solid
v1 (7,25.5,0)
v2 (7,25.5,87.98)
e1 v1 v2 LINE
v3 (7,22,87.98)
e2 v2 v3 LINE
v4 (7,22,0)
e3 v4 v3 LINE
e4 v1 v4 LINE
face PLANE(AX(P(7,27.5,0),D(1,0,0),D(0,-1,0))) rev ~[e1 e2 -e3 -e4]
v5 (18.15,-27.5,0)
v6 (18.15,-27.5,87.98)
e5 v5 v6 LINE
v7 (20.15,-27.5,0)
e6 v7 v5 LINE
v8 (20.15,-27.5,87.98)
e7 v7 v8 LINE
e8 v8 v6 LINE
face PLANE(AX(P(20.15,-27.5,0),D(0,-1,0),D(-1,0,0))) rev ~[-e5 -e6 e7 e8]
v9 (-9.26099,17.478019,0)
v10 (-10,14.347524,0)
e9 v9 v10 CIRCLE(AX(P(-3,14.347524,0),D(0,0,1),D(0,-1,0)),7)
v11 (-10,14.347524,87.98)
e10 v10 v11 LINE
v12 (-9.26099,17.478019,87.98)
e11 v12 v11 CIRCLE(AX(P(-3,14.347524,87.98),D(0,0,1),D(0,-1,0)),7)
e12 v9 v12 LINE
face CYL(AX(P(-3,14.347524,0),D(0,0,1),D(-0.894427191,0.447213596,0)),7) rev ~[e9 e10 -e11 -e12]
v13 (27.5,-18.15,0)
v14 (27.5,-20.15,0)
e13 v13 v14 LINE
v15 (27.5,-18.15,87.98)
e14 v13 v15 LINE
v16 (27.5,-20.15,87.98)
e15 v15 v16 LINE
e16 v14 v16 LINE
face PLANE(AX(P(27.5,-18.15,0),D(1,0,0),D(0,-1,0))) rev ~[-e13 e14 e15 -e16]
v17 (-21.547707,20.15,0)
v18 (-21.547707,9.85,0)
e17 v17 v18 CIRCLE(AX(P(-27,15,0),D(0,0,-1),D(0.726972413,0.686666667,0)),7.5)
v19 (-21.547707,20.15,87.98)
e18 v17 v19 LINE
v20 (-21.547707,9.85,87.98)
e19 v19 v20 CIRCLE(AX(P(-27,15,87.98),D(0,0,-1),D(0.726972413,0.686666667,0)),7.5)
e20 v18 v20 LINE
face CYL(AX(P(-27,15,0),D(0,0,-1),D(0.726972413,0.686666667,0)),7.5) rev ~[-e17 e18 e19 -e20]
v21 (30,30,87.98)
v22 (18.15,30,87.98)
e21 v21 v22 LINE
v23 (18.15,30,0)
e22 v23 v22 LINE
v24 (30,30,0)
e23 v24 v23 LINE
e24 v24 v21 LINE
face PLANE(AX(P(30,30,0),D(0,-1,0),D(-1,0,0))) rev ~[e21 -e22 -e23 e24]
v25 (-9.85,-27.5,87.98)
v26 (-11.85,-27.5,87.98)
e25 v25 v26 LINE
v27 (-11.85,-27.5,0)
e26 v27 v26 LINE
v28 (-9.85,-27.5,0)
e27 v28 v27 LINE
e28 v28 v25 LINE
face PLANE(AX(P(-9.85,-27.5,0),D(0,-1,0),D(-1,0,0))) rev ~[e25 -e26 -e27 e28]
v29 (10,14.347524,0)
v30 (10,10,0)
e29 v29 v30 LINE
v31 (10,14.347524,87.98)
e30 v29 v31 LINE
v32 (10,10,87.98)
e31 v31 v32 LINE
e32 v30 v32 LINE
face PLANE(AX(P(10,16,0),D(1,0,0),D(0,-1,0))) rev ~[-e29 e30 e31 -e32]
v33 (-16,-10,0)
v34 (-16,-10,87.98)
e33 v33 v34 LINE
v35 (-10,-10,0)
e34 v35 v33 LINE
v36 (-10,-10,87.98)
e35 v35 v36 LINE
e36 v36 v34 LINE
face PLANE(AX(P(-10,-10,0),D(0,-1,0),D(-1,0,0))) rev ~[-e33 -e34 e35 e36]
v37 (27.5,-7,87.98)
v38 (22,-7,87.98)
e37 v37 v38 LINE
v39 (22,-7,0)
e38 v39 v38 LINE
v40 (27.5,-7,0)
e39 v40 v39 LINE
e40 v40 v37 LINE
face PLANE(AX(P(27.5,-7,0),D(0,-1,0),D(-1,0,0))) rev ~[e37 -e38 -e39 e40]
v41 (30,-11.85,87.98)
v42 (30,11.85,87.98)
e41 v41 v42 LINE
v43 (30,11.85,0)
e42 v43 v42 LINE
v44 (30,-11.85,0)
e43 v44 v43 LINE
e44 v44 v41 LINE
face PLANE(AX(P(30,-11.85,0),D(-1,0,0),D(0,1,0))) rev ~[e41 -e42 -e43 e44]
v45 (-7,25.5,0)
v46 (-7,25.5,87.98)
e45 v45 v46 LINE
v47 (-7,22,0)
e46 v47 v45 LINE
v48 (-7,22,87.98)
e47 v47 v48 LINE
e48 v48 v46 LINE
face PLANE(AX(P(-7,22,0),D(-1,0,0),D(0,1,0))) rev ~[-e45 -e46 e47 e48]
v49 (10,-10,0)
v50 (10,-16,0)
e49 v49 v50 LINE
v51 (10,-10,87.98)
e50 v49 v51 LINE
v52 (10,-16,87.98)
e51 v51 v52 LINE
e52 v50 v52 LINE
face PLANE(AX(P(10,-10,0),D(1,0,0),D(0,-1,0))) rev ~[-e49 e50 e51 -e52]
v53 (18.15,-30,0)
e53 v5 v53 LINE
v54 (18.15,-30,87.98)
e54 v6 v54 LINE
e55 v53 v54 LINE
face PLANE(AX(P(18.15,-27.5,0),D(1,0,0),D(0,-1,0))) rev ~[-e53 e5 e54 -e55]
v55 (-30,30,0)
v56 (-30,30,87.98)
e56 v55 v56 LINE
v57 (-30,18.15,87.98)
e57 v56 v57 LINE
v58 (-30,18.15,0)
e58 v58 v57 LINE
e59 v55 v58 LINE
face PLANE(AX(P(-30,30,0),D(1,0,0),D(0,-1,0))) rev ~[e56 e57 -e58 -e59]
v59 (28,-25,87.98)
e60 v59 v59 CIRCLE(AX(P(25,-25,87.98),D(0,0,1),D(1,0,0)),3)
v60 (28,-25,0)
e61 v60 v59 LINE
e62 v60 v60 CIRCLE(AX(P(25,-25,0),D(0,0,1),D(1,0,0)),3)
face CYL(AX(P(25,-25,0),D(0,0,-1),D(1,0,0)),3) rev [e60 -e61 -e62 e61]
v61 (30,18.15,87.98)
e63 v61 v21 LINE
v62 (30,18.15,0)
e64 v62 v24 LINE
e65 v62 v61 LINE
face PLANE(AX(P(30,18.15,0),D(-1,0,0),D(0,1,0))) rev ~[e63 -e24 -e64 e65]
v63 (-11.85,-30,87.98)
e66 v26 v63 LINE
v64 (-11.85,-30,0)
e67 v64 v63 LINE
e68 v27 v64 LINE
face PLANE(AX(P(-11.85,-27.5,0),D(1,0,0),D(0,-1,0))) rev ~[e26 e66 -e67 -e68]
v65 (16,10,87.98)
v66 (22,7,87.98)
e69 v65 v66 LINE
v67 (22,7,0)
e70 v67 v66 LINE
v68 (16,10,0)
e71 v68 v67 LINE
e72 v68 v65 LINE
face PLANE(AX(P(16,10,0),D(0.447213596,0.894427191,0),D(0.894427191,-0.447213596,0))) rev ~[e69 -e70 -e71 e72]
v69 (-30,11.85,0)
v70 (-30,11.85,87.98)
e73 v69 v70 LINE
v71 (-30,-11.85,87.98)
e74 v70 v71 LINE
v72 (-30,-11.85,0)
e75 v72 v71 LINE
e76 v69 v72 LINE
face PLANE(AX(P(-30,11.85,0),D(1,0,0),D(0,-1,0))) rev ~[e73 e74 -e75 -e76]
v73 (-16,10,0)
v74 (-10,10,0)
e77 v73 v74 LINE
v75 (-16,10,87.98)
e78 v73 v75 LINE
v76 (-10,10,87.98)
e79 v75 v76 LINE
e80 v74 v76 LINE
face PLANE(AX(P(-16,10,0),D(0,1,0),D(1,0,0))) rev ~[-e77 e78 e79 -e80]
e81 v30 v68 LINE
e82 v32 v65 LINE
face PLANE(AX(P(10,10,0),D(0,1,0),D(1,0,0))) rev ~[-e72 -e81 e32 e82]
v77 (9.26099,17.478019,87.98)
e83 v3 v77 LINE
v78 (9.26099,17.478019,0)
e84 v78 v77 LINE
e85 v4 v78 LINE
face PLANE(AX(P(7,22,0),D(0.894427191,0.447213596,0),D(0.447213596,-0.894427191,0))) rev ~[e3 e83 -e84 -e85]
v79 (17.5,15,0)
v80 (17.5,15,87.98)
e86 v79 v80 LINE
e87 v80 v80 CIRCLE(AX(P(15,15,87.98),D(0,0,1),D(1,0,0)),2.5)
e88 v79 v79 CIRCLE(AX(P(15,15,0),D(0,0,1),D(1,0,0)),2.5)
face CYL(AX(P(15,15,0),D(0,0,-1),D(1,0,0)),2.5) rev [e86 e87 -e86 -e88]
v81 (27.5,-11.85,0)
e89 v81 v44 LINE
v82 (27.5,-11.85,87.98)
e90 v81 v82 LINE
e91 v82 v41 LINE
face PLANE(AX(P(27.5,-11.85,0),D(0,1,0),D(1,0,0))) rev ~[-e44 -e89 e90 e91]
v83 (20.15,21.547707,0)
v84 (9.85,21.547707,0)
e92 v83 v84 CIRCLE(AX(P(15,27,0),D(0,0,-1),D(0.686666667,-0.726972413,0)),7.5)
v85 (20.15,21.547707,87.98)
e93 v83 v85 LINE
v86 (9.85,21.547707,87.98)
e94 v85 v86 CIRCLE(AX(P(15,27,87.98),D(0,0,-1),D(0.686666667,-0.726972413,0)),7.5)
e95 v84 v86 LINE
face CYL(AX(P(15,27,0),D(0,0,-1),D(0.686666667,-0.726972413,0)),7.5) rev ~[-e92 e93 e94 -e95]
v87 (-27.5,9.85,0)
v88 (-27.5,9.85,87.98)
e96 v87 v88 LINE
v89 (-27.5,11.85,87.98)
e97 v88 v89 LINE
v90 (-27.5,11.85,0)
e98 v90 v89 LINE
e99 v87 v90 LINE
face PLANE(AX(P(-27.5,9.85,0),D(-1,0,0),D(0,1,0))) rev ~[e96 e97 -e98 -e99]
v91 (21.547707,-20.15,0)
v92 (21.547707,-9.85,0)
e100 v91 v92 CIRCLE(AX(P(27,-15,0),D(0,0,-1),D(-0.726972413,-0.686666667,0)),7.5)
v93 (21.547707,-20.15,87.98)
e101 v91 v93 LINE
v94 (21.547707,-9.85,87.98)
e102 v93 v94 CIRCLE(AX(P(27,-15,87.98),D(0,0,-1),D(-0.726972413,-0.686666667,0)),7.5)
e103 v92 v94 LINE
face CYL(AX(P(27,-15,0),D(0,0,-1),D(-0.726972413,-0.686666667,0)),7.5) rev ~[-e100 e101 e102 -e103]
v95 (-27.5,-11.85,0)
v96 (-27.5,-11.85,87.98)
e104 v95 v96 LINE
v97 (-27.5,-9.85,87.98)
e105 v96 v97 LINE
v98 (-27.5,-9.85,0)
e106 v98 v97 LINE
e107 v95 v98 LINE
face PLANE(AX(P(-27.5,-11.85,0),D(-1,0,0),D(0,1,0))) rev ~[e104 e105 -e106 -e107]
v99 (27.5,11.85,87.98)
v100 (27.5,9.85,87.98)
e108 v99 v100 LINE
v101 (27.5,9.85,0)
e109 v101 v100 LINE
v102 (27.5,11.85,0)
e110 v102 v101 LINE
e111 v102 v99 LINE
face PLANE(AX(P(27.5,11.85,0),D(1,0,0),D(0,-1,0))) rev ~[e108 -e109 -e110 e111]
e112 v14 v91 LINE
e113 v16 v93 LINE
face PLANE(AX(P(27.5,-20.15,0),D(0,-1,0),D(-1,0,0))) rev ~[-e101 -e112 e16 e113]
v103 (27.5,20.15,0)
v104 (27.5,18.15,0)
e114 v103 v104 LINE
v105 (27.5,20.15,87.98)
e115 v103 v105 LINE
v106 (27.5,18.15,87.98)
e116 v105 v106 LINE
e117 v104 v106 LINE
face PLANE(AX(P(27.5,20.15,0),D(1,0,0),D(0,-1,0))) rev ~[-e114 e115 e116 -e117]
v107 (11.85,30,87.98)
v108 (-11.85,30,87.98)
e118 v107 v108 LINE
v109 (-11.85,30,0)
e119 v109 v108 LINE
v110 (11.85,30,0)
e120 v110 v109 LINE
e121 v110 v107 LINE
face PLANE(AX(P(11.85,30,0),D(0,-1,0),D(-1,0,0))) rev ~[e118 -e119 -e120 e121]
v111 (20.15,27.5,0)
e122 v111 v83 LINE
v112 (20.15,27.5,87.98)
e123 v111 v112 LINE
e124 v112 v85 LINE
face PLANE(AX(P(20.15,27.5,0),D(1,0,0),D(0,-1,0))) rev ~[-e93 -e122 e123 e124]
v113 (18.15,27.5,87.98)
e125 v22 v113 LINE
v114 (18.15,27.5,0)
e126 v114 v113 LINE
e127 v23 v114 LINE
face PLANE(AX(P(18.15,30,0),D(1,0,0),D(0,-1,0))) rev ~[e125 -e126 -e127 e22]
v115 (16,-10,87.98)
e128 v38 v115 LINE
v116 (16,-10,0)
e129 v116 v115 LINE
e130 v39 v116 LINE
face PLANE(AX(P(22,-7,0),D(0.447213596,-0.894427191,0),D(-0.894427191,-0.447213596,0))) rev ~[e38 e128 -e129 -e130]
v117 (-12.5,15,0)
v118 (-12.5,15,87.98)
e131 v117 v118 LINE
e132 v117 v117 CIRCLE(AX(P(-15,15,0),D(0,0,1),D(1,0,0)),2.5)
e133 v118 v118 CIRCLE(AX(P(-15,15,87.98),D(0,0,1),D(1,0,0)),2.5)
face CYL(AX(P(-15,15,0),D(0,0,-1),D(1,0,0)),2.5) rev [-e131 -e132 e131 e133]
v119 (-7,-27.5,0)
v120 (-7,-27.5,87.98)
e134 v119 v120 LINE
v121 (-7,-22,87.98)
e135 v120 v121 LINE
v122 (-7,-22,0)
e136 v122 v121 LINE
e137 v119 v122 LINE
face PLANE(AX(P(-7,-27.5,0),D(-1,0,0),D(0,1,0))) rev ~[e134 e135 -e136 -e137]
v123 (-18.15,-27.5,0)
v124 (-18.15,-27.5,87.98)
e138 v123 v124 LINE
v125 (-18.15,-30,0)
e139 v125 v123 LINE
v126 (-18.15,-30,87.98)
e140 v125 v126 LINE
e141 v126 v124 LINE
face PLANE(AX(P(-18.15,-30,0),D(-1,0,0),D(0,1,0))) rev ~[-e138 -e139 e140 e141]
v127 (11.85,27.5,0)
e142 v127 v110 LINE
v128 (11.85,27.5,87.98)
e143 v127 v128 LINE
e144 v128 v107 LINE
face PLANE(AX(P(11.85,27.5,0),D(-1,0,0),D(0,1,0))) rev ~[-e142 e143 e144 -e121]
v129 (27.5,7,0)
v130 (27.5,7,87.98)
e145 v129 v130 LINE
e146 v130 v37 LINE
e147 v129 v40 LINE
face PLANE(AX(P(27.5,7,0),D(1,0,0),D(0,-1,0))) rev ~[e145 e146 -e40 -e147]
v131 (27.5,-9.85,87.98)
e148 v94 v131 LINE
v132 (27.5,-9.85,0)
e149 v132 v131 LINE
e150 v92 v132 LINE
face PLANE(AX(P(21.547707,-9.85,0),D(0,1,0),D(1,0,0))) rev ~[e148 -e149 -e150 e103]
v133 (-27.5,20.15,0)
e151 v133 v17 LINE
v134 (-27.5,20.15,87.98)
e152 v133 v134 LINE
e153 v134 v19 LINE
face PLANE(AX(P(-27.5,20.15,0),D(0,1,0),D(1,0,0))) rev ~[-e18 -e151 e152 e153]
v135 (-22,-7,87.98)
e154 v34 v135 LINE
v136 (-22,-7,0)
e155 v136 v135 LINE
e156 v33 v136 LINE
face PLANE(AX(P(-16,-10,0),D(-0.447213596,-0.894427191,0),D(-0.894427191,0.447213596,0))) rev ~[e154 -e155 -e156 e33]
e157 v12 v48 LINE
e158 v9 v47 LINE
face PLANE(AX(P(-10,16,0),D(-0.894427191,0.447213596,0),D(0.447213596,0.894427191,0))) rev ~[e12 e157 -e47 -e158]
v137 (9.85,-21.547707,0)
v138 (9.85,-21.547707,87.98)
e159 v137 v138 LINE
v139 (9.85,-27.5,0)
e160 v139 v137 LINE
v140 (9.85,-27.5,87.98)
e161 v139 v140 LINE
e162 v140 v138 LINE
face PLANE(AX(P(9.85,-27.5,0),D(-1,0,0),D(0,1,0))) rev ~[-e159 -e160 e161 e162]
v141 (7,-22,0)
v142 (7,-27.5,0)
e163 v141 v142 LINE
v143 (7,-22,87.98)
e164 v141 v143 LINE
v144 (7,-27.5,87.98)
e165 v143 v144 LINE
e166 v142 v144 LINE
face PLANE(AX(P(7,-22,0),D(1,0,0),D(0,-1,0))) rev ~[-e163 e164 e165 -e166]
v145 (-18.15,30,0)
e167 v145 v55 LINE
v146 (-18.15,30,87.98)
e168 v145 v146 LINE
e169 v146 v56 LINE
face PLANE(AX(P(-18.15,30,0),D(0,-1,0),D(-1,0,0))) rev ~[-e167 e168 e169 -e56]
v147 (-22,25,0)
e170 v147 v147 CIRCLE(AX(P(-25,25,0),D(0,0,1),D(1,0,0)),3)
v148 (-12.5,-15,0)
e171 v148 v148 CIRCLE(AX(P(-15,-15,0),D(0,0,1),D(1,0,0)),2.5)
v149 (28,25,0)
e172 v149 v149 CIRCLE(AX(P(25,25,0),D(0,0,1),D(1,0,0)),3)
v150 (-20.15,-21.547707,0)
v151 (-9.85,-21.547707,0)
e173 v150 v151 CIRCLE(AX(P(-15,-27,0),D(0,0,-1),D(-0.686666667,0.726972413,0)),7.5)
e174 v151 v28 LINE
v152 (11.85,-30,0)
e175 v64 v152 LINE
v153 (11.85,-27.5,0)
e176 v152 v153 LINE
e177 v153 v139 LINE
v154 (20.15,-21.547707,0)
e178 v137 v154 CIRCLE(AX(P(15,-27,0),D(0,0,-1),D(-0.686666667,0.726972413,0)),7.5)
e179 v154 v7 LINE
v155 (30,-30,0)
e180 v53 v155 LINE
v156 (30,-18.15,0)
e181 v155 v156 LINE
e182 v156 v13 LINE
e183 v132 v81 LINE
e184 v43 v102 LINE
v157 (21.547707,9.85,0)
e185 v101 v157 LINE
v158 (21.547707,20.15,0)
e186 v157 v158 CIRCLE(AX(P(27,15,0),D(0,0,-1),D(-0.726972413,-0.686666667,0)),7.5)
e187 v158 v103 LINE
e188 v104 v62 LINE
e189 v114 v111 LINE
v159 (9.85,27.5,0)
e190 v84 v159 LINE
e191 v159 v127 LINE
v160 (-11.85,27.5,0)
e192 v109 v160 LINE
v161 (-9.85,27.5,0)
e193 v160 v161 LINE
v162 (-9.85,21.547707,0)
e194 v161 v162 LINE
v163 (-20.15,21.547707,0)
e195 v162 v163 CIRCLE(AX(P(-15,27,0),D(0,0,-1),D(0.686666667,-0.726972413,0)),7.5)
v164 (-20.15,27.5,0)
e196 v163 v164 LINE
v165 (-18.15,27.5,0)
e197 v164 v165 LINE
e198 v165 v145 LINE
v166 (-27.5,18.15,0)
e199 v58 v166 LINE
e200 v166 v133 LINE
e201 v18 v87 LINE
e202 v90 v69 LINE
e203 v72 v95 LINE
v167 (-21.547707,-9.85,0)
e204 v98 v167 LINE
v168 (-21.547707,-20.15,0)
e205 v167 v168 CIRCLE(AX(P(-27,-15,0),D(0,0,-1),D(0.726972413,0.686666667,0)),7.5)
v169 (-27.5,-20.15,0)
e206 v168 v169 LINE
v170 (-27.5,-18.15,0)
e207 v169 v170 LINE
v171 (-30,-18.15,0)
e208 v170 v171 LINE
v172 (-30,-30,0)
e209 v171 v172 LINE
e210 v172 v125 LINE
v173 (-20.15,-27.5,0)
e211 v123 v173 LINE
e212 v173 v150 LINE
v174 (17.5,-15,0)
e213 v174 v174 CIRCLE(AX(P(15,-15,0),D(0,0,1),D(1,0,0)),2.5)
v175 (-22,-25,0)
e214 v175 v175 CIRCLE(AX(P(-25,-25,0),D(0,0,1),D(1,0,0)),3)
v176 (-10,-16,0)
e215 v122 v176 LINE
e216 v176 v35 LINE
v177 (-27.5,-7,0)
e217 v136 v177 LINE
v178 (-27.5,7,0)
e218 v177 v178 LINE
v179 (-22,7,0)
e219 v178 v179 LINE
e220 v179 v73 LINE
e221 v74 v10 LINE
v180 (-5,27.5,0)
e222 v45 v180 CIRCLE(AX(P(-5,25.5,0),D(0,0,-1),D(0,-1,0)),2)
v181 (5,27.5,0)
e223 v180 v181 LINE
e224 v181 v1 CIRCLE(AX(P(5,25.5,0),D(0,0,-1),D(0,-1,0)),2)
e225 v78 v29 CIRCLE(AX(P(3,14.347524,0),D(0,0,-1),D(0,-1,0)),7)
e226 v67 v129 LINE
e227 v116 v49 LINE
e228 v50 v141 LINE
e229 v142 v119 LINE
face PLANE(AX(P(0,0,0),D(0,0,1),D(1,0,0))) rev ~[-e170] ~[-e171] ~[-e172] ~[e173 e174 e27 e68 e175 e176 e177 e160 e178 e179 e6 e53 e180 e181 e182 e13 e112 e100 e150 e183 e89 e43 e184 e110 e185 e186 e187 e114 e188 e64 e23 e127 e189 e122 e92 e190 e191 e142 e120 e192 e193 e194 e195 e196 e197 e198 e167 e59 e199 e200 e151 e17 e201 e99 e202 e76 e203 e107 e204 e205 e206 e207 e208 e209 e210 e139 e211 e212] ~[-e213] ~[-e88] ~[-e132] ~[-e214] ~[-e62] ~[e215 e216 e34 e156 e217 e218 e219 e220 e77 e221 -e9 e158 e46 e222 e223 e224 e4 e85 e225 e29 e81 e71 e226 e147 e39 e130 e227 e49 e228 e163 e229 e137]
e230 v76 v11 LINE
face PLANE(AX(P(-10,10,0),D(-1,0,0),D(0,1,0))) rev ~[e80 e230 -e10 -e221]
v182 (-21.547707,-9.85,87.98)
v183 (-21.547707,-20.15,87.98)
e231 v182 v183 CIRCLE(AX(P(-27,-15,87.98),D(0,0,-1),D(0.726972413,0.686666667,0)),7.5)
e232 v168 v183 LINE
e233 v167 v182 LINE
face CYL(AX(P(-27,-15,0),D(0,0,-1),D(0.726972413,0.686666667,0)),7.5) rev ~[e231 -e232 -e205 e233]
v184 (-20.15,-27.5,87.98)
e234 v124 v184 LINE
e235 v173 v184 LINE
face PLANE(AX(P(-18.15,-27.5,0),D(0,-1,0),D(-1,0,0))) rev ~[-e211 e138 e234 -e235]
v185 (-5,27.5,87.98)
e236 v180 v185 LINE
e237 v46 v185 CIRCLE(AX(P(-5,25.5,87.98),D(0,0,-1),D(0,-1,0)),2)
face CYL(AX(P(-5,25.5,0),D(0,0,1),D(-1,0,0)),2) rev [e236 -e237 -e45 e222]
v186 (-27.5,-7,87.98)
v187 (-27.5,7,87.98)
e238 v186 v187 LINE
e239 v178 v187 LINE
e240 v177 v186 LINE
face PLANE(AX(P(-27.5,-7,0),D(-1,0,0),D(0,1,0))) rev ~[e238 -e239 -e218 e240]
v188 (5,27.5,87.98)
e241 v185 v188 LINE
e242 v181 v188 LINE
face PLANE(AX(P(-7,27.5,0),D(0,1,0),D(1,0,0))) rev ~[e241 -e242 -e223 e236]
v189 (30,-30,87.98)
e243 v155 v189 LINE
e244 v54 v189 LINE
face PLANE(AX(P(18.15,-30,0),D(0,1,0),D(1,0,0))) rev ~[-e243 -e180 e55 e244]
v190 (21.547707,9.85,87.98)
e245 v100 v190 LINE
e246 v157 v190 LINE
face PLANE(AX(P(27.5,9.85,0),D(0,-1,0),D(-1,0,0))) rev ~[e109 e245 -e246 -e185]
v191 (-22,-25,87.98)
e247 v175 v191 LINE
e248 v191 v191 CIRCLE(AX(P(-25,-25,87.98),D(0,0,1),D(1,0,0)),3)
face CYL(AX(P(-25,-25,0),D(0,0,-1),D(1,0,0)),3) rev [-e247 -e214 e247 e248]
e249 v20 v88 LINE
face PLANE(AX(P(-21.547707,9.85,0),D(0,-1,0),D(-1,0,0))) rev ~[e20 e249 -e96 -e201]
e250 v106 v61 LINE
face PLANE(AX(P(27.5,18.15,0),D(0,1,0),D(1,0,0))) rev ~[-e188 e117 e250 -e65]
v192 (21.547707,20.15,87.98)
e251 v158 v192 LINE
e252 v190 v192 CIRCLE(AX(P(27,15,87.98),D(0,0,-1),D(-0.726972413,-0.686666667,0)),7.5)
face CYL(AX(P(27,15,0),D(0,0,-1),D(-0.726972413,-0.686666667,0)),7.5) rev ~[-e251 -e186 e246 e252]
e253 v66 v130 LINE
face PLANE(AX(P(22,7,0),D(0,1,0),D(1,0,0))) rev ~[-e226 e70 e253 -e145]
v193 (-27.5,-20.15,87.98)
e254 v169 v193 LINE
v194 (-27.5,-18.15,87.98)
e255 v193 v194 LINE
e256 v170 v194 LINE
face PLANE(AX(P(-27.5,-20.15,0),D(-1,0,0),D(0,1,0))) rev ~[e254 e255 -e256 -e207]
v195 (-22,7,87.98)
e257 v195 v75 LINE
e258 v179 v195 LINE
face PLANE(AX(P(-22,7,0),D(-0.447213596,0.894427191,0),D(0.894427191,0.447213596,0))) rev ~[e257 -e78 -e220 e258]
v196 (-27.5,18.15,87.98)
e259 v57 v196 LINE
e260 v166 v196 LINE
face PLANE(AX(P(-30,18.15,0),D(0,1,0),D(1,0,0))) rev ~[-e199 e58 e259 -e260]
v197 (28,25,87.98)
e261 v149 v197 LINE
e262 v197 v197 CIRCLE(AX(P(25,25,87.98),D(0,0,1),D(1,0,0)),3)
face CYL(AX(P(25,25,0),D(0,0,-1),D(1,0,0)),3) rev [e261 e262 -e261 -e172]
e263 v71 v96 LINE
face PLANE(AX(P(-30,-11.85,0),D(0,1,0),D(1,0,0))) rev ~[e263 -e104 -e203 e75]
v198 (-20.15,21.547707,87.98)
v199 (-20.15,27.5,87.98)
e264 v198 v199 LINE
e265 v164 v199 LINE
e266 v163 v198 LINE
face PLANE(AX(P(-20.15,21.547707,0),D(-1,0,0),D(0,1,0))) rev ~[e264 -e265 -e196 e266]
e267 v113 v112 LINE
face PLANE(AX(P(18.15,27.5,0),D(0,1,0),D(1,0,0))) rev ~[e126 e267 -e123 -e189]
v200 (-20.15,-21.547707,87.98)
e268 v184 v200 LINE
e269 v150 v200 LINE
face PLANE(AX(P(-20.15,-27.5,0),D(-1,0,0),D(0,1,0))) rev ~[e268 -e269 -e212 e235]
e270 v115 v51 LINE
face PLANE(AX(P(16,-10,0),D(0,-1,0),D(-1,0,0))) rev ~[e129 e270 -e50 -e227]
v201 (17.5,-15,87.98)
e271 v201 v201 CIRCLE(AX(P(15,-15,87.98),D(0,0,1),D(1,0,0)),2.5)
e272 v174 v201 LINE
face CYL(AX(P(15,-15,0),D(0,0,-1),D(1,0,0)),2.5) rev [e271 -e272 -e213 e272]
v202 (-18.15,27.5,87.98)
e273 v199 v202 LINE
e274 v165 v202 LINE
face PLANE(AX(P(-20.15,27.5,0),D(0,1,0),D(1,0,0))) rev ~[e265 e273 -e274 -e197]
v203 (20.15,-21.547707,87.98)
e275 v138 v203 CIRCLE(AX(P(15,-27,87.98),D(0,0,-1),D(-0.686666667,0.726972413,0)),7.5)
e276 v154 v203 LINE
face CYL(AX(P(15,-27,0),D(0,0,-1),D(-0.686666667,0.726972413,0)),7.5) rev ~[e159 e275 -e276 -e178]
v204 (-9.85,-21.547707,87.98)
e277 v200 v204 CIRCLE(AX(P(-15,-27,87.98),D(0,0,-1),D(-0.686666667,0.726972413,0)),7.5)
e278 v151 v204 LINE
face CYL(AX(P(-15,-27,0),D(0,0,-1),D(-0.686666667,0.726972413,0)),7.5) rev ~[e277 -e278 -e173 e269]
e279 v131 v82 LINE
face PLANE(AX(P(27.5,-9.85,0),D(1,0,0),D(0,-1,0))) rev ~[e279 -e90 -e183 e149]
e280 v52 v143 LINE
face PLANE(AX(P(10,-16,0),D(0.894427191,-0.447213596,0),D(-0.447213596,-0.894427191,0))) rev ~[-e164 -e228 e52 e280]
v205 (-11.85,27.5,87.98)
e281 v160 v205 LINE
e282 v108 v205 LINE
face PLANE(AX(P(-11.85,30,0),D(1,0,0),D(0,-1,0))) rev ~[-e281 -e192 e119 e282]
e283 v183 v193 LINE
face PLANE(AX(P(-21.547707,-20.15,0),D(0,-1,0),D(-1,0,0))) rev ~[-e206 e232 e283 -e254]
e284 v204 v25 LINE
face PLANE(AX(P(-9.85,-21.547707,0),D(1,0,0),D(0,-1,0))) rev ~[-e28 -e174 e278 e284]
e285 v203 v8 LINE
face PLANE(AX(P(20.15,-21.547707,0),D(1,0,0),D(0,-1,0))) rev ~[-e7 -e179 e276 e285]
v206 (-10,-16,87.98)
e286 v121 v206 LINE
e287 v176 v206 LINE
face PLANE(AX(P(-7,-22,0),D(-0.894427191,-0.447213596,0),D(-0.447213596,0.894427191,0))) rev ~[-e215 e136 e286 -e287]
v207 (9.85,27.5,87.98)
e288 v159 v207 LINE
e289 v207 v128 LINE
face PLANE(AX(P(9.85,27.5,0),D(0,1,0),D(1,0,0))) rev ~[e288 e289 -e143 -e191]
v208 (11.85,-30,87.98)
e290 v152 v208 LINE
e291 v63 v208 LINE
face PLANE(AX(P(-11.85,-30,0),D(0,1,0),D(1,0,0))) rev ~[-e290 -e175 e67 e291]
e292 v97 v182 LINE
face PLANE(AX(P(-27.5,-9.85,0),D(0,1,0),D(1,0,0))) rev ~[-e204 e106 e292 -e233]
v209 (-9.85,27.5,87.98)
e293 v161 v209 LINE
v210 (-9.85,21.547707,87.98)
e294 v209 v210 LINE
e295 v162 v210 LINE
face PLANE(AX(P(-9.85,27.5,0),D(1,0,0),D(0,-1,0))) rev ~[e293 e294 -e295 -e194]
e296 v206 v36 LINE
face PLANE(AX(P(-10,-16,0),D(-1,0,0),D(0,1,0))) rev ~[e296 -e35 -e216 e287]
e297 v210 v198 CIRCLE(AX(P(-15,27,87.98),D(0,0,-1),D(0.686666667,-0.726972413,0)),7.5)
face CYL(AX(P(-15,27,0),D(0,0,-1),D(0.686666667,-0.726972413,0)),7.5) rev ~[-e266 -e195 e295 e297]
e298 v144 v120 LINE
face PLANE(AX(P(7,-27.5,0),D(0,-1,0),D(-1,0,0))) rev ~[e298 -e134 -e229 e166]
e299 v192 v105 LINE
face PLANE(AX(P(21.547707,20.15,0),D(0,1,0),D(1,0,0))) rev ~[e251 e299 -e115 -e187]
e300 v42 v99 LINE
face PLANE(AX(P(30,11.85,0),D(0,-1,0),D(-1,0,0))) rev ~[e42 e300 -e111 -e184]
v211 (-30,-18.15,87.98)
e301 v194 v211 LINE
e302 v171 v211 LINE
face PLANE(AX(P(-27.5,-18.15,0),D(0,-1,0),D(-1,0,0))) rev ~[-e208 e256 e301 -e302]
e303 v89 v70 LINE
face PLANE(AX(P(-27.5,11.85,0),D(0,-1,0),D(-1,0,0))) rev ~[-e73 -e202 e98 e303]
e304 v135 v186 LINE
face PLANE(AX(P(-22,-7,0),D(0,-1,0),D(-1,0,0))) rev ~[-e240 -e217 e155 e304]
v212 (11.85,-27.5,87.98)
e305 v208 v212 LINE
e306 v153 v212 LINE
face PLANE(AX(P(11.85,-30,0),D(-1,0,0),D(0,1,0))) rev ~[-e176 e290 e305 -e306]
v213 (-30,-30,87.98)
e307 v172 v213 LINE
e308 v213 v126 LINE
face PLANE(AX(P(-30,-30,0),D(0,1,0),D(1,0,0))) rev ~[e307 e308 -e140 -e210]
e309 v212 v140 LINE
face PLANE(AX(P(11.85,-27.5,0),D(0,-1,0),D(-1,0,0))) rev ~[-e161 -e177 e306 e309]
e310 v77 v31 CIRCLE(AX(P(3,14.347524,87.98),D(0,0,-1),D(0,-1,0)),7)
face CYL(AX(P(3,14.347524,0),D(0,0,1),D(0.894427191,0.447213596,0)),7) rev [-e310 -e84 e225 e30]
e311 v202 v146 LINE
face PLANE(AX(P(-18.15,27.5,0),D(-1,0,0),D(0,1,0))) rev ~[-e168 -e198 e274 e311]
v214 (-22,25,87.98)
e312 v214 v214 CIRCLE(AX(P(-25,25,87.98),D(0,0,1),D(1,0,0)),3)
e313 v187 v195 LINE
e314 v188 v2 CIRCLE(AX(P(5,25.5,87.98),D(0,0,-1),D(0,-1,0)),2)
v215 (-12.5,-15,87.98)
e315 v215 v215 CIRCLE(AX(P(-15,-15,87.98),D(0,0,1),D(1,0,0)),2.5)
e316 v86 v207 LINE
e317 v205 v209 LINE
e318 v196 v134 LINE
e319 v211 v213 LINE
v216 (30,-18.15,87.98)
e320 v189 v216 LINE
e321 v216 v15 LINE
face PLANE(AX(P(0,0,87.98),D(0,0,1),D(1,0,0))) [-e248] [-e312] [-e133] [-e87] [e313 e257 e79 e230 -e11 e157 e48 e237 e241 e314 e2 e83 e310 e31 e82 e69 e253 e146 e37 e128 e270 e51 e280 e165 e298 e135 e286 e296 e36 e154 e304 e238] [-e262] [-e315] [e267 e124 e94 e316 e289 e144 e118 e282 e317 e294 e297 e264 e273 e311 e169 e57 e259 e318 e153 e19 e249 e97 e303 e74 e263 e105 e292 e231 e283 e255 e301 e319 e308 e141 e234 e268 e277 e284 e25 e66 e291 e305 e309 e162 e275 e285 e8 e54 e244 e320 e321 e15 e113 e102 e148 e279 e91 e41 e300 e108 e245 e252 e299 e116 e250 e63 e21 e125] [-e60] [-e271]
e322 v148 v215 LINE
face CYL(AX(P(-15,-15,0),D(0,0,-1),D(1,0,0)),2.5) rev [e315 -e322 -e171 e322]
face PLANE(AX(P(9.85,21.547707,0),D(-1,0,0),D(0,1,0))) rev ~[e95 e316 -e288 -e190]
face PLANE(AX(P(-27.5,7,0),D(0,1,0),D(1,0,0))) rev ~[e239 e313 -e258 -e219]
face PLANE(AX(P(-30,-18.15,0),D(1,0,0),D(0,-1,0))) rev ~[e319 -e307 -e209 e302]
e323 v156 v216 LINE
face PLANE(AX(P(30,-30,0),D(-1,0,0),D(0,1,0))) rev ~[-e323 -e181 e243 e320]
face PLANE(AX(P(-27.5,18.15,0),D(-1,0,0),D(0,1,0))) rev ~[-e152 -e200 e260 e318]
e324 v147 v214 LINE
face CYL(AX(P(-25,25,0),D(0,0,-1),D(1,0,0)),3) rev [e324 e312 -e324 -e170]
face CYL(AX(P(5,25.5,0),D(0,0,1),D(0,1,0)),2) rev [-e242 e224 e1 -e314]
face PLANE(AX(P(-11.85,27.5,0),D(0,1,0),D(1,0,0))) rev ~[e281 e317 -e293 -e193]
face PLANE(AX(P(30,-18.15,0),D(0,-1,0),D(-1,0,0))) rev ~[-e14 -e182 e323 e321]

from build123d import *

# Parameters (mm, degrees)
F0_R     = 3
F0_R_2   = 2.5
F1_DEPTH = 87.98
F2_R     = 2
F3_R     = 7


# Not quite as in the source:
# - a feature names something its author has since deleted; it is built from what else it names


with BuildPart() as f1:
    # F0 (on Top) → F1 (new body)
    with BuildSketch(Plane.XY):
        with BuildLine():
            Line((18.15, -30), (30, -30))
            Line((30, -30), (30, -18.15))
            Line((30, -18.15), (27.5, -18.15))
            Line((27.5, -18.15), (27.5, -20.15))
            Line((27.5, -20.15), (21.5477069044, -20.15))
            ThreePointArc((21.5477069044, -20.15), (19.5, -15), (21.5477069044, -9.85))
            Line((21.5477069044, -9.85), (27.5, -9.85))
            Line((27.5, -9.85), (27.5, -11.85))
            Line((27.5, -11.85), (30, -11.85))
            Line((30, -11.85), (30, 11.85))
            Line((30, 11.85), (27.5, 11.85))
            Line((27.5, 11.85), (27.5, 9.85))
            Line((27.5, 9.85), (21.5477069044, 9.85))
            ThreePointArc((21.5477069044, 9.85), (19.5, 15), (21.5477069044, 20.15))
            Line((21.5477069044, 20.15), (27.5, 20.15))
            Line((27.5, 20.15), (27.5, 18.15))
            Line((27.5, 18.15), (30, 18.15))
            Line((30, 18.15), (30, 30))
            Line((30, 30), (18.15, 30))
            Line((18.15, 30), (18.15, 27.5))
            Line((18.15, 27.5), (20.15, 27.5))
            Line((20.15, 27.5), (20.15, 21.5477069044))
            ThreePointArc((20.15, 21.5477069044), (15, 19.5), (9.85, 21.5477069044))
            Line((9.85, 21.5477069044), (9.85, 27.5))
            Line((9.85, 27.5), (11.85, 27.5))
            Line((11.85, 27.5), (11.85, 30))
            Line((11.85, 30), (-11.85, 30))
            Line((-11.85, 30), (-11.85, 27.5))
            Line((-11.85, 27.5), (-9.85, 27.5))
            Line((-9.85, 27.5), (-9.85, 21.5477069044))
            ThreePointArc((-9.85, 21.5477069044), (-15, 19.5), (-20.15, 21.5477069044))
            Line((-20.15, 21.5477069044), (-20.15, 27.5))
            Line((-20.15, 27.5), (-18.15, 27.5))
            Line((-18.15, 27.5), (-18.15, 30))
            Line((-18.15, 30), (-30, 30))
            Line((-30, 30), (-30, 18.15))
            Line((-30, 18.15), (-27.5, 18.15))
            Line((-27.5, 18.15), (-27.5, 20.15))
            Line((-27.5, 20.15), (-21.5477069044, 20.15))
            ThreePointArc((-21.5477069044, 20.15), (-19.5, 15), (-21.5477069044, 9.85))
            Line((-21.5477069044, 9.85), (-27.5, 9.85))
            Line((-27.5, 9.85), (-27.5, 11.85))
            Line((-27.5, 11.85), (-30, 11.85))
            Line((-30, 11.85), (-30, -11.85))
            Line((-30, -11.85), (-27.5, -11.85))
            Line((-27.5, -11.85), (-27.5, -9.85))
            Line((-27.5, -9.85), (-21.5477069044, -9.85))
            ThreePointArc((-21.5477069044, -9.85), (-19.5, -15), (-21.5477069044, -20.15))
            Line((-21.5477069044, -20.15), (-27.5, -20.15))
            Line((-27.5, -20.15), (-27.5, -18.15))
            Line((-27.5, -18.15), (-30, -18.15))
            Line((-30, -18.15), (-30, -30))
            Line((-30, -30), (-18.15, -30))
            Line((-18.15, -30), (-18.15, -27.5))
            Line((-18.15, -27.5), (-20.15, -27.5))
            Line((-20.15, -27.5), (-20.15, -21.5477069044))
            ThreePointArc((-20.15, -21.5477069044), (-15, -19.5), (-9.85, -21.5477069044))
            Line((-9.85, -21.5477069044), (-9.85, -27.5))
            Line((-9.85, -27.5), (-11.85, -27.5))
            Line((-11.85, -27.5), (-11.85, -30))
            Line((-11.85, -30), (11.85, -30))
            Line((11.85, -30), (11.85, -27.5))
            Line((11.85, -27.5), (9.85, -27.5))
            Line((9.85, -27.5), (9.85, -21.5477069044))
            ThreePointArc((9.85, -21.5477069044), (15, -19.5), (20.15, -21.5477069044))
            Line((20.15, -21.5477069044), (20.15, -27.5))
            Line((20.15, -27.5), (18.15, -27.5))
            Line((18.15, -27.5), (18.15, -30))
        make_face()
        with Locations((-25, -25)):
            Circle(F0_R, mode=Mode.SUBTRACT)
        with Locations((-15, -15)):
            Circle(F0_R_2, mode=Mode.SUBTRACT)
        with Locations((25, -25)):
            Circle(F0_R, mode=Mode.SUBTRACT)
        with Locations((15, -15)):
            Circle(F0_R_2, mode=Mode.SUBTRACT)
        with Locations((-25, 25)):
            Circle(F0_R, mode=Mode.SUBTRACT)
        with Locations((-15, 15)):
            Circle(F0_R_2, mode=Mode.SUBTRACT)
        Polygon((-7, 22), (-7, 27.5), (0, 27.5), (7, 27.5), (7, 22), (10, 16), (10, 10), (16, 10), (22, 7), (27.5, 7), (27.5, 0), (27.5, -7), (22, -7), (16, -10), (10, -10), (10, -16), (7, -22), (7, -27.5), (0, -27.5), (-7, -27.5), (-7, -22), (-10, -16), (-10, -10), (-16, -10), (-22, -7), (-27.5, -7), (-27.5, 0), (-27.5, 7), (-22, 7), (-16, 10), (-10, 10), (-10, 16), align=None, mode=Mode.SUBTRACT)
        with Locations((15, 15)):
            Circle(F0_R_2, mode=Mode.SUBTRACT)
        with Locations((25, 25)):
            Circle(F0_R, mode=Mode.SUBTRACT)
    extrude(amount=F1_DEPTH)

    # F2
    f2_edges = [f1.edges().sort_by_distance(p)[0] for p in [
        (-7, 27.5, 43.99),
        (7, 27.5, 43.99),
    ]]
    fillet(f2_edges, radius=F2_R)

    # F3
    f3_edges = [f1.edges().sort_by_distance(p)[0] for p in [
        (-10, 16, 43.99),
        (10, 16, 43.99),
    ]]
    fillet(f3_edges, radius=F3_R)


solid = f1.part
